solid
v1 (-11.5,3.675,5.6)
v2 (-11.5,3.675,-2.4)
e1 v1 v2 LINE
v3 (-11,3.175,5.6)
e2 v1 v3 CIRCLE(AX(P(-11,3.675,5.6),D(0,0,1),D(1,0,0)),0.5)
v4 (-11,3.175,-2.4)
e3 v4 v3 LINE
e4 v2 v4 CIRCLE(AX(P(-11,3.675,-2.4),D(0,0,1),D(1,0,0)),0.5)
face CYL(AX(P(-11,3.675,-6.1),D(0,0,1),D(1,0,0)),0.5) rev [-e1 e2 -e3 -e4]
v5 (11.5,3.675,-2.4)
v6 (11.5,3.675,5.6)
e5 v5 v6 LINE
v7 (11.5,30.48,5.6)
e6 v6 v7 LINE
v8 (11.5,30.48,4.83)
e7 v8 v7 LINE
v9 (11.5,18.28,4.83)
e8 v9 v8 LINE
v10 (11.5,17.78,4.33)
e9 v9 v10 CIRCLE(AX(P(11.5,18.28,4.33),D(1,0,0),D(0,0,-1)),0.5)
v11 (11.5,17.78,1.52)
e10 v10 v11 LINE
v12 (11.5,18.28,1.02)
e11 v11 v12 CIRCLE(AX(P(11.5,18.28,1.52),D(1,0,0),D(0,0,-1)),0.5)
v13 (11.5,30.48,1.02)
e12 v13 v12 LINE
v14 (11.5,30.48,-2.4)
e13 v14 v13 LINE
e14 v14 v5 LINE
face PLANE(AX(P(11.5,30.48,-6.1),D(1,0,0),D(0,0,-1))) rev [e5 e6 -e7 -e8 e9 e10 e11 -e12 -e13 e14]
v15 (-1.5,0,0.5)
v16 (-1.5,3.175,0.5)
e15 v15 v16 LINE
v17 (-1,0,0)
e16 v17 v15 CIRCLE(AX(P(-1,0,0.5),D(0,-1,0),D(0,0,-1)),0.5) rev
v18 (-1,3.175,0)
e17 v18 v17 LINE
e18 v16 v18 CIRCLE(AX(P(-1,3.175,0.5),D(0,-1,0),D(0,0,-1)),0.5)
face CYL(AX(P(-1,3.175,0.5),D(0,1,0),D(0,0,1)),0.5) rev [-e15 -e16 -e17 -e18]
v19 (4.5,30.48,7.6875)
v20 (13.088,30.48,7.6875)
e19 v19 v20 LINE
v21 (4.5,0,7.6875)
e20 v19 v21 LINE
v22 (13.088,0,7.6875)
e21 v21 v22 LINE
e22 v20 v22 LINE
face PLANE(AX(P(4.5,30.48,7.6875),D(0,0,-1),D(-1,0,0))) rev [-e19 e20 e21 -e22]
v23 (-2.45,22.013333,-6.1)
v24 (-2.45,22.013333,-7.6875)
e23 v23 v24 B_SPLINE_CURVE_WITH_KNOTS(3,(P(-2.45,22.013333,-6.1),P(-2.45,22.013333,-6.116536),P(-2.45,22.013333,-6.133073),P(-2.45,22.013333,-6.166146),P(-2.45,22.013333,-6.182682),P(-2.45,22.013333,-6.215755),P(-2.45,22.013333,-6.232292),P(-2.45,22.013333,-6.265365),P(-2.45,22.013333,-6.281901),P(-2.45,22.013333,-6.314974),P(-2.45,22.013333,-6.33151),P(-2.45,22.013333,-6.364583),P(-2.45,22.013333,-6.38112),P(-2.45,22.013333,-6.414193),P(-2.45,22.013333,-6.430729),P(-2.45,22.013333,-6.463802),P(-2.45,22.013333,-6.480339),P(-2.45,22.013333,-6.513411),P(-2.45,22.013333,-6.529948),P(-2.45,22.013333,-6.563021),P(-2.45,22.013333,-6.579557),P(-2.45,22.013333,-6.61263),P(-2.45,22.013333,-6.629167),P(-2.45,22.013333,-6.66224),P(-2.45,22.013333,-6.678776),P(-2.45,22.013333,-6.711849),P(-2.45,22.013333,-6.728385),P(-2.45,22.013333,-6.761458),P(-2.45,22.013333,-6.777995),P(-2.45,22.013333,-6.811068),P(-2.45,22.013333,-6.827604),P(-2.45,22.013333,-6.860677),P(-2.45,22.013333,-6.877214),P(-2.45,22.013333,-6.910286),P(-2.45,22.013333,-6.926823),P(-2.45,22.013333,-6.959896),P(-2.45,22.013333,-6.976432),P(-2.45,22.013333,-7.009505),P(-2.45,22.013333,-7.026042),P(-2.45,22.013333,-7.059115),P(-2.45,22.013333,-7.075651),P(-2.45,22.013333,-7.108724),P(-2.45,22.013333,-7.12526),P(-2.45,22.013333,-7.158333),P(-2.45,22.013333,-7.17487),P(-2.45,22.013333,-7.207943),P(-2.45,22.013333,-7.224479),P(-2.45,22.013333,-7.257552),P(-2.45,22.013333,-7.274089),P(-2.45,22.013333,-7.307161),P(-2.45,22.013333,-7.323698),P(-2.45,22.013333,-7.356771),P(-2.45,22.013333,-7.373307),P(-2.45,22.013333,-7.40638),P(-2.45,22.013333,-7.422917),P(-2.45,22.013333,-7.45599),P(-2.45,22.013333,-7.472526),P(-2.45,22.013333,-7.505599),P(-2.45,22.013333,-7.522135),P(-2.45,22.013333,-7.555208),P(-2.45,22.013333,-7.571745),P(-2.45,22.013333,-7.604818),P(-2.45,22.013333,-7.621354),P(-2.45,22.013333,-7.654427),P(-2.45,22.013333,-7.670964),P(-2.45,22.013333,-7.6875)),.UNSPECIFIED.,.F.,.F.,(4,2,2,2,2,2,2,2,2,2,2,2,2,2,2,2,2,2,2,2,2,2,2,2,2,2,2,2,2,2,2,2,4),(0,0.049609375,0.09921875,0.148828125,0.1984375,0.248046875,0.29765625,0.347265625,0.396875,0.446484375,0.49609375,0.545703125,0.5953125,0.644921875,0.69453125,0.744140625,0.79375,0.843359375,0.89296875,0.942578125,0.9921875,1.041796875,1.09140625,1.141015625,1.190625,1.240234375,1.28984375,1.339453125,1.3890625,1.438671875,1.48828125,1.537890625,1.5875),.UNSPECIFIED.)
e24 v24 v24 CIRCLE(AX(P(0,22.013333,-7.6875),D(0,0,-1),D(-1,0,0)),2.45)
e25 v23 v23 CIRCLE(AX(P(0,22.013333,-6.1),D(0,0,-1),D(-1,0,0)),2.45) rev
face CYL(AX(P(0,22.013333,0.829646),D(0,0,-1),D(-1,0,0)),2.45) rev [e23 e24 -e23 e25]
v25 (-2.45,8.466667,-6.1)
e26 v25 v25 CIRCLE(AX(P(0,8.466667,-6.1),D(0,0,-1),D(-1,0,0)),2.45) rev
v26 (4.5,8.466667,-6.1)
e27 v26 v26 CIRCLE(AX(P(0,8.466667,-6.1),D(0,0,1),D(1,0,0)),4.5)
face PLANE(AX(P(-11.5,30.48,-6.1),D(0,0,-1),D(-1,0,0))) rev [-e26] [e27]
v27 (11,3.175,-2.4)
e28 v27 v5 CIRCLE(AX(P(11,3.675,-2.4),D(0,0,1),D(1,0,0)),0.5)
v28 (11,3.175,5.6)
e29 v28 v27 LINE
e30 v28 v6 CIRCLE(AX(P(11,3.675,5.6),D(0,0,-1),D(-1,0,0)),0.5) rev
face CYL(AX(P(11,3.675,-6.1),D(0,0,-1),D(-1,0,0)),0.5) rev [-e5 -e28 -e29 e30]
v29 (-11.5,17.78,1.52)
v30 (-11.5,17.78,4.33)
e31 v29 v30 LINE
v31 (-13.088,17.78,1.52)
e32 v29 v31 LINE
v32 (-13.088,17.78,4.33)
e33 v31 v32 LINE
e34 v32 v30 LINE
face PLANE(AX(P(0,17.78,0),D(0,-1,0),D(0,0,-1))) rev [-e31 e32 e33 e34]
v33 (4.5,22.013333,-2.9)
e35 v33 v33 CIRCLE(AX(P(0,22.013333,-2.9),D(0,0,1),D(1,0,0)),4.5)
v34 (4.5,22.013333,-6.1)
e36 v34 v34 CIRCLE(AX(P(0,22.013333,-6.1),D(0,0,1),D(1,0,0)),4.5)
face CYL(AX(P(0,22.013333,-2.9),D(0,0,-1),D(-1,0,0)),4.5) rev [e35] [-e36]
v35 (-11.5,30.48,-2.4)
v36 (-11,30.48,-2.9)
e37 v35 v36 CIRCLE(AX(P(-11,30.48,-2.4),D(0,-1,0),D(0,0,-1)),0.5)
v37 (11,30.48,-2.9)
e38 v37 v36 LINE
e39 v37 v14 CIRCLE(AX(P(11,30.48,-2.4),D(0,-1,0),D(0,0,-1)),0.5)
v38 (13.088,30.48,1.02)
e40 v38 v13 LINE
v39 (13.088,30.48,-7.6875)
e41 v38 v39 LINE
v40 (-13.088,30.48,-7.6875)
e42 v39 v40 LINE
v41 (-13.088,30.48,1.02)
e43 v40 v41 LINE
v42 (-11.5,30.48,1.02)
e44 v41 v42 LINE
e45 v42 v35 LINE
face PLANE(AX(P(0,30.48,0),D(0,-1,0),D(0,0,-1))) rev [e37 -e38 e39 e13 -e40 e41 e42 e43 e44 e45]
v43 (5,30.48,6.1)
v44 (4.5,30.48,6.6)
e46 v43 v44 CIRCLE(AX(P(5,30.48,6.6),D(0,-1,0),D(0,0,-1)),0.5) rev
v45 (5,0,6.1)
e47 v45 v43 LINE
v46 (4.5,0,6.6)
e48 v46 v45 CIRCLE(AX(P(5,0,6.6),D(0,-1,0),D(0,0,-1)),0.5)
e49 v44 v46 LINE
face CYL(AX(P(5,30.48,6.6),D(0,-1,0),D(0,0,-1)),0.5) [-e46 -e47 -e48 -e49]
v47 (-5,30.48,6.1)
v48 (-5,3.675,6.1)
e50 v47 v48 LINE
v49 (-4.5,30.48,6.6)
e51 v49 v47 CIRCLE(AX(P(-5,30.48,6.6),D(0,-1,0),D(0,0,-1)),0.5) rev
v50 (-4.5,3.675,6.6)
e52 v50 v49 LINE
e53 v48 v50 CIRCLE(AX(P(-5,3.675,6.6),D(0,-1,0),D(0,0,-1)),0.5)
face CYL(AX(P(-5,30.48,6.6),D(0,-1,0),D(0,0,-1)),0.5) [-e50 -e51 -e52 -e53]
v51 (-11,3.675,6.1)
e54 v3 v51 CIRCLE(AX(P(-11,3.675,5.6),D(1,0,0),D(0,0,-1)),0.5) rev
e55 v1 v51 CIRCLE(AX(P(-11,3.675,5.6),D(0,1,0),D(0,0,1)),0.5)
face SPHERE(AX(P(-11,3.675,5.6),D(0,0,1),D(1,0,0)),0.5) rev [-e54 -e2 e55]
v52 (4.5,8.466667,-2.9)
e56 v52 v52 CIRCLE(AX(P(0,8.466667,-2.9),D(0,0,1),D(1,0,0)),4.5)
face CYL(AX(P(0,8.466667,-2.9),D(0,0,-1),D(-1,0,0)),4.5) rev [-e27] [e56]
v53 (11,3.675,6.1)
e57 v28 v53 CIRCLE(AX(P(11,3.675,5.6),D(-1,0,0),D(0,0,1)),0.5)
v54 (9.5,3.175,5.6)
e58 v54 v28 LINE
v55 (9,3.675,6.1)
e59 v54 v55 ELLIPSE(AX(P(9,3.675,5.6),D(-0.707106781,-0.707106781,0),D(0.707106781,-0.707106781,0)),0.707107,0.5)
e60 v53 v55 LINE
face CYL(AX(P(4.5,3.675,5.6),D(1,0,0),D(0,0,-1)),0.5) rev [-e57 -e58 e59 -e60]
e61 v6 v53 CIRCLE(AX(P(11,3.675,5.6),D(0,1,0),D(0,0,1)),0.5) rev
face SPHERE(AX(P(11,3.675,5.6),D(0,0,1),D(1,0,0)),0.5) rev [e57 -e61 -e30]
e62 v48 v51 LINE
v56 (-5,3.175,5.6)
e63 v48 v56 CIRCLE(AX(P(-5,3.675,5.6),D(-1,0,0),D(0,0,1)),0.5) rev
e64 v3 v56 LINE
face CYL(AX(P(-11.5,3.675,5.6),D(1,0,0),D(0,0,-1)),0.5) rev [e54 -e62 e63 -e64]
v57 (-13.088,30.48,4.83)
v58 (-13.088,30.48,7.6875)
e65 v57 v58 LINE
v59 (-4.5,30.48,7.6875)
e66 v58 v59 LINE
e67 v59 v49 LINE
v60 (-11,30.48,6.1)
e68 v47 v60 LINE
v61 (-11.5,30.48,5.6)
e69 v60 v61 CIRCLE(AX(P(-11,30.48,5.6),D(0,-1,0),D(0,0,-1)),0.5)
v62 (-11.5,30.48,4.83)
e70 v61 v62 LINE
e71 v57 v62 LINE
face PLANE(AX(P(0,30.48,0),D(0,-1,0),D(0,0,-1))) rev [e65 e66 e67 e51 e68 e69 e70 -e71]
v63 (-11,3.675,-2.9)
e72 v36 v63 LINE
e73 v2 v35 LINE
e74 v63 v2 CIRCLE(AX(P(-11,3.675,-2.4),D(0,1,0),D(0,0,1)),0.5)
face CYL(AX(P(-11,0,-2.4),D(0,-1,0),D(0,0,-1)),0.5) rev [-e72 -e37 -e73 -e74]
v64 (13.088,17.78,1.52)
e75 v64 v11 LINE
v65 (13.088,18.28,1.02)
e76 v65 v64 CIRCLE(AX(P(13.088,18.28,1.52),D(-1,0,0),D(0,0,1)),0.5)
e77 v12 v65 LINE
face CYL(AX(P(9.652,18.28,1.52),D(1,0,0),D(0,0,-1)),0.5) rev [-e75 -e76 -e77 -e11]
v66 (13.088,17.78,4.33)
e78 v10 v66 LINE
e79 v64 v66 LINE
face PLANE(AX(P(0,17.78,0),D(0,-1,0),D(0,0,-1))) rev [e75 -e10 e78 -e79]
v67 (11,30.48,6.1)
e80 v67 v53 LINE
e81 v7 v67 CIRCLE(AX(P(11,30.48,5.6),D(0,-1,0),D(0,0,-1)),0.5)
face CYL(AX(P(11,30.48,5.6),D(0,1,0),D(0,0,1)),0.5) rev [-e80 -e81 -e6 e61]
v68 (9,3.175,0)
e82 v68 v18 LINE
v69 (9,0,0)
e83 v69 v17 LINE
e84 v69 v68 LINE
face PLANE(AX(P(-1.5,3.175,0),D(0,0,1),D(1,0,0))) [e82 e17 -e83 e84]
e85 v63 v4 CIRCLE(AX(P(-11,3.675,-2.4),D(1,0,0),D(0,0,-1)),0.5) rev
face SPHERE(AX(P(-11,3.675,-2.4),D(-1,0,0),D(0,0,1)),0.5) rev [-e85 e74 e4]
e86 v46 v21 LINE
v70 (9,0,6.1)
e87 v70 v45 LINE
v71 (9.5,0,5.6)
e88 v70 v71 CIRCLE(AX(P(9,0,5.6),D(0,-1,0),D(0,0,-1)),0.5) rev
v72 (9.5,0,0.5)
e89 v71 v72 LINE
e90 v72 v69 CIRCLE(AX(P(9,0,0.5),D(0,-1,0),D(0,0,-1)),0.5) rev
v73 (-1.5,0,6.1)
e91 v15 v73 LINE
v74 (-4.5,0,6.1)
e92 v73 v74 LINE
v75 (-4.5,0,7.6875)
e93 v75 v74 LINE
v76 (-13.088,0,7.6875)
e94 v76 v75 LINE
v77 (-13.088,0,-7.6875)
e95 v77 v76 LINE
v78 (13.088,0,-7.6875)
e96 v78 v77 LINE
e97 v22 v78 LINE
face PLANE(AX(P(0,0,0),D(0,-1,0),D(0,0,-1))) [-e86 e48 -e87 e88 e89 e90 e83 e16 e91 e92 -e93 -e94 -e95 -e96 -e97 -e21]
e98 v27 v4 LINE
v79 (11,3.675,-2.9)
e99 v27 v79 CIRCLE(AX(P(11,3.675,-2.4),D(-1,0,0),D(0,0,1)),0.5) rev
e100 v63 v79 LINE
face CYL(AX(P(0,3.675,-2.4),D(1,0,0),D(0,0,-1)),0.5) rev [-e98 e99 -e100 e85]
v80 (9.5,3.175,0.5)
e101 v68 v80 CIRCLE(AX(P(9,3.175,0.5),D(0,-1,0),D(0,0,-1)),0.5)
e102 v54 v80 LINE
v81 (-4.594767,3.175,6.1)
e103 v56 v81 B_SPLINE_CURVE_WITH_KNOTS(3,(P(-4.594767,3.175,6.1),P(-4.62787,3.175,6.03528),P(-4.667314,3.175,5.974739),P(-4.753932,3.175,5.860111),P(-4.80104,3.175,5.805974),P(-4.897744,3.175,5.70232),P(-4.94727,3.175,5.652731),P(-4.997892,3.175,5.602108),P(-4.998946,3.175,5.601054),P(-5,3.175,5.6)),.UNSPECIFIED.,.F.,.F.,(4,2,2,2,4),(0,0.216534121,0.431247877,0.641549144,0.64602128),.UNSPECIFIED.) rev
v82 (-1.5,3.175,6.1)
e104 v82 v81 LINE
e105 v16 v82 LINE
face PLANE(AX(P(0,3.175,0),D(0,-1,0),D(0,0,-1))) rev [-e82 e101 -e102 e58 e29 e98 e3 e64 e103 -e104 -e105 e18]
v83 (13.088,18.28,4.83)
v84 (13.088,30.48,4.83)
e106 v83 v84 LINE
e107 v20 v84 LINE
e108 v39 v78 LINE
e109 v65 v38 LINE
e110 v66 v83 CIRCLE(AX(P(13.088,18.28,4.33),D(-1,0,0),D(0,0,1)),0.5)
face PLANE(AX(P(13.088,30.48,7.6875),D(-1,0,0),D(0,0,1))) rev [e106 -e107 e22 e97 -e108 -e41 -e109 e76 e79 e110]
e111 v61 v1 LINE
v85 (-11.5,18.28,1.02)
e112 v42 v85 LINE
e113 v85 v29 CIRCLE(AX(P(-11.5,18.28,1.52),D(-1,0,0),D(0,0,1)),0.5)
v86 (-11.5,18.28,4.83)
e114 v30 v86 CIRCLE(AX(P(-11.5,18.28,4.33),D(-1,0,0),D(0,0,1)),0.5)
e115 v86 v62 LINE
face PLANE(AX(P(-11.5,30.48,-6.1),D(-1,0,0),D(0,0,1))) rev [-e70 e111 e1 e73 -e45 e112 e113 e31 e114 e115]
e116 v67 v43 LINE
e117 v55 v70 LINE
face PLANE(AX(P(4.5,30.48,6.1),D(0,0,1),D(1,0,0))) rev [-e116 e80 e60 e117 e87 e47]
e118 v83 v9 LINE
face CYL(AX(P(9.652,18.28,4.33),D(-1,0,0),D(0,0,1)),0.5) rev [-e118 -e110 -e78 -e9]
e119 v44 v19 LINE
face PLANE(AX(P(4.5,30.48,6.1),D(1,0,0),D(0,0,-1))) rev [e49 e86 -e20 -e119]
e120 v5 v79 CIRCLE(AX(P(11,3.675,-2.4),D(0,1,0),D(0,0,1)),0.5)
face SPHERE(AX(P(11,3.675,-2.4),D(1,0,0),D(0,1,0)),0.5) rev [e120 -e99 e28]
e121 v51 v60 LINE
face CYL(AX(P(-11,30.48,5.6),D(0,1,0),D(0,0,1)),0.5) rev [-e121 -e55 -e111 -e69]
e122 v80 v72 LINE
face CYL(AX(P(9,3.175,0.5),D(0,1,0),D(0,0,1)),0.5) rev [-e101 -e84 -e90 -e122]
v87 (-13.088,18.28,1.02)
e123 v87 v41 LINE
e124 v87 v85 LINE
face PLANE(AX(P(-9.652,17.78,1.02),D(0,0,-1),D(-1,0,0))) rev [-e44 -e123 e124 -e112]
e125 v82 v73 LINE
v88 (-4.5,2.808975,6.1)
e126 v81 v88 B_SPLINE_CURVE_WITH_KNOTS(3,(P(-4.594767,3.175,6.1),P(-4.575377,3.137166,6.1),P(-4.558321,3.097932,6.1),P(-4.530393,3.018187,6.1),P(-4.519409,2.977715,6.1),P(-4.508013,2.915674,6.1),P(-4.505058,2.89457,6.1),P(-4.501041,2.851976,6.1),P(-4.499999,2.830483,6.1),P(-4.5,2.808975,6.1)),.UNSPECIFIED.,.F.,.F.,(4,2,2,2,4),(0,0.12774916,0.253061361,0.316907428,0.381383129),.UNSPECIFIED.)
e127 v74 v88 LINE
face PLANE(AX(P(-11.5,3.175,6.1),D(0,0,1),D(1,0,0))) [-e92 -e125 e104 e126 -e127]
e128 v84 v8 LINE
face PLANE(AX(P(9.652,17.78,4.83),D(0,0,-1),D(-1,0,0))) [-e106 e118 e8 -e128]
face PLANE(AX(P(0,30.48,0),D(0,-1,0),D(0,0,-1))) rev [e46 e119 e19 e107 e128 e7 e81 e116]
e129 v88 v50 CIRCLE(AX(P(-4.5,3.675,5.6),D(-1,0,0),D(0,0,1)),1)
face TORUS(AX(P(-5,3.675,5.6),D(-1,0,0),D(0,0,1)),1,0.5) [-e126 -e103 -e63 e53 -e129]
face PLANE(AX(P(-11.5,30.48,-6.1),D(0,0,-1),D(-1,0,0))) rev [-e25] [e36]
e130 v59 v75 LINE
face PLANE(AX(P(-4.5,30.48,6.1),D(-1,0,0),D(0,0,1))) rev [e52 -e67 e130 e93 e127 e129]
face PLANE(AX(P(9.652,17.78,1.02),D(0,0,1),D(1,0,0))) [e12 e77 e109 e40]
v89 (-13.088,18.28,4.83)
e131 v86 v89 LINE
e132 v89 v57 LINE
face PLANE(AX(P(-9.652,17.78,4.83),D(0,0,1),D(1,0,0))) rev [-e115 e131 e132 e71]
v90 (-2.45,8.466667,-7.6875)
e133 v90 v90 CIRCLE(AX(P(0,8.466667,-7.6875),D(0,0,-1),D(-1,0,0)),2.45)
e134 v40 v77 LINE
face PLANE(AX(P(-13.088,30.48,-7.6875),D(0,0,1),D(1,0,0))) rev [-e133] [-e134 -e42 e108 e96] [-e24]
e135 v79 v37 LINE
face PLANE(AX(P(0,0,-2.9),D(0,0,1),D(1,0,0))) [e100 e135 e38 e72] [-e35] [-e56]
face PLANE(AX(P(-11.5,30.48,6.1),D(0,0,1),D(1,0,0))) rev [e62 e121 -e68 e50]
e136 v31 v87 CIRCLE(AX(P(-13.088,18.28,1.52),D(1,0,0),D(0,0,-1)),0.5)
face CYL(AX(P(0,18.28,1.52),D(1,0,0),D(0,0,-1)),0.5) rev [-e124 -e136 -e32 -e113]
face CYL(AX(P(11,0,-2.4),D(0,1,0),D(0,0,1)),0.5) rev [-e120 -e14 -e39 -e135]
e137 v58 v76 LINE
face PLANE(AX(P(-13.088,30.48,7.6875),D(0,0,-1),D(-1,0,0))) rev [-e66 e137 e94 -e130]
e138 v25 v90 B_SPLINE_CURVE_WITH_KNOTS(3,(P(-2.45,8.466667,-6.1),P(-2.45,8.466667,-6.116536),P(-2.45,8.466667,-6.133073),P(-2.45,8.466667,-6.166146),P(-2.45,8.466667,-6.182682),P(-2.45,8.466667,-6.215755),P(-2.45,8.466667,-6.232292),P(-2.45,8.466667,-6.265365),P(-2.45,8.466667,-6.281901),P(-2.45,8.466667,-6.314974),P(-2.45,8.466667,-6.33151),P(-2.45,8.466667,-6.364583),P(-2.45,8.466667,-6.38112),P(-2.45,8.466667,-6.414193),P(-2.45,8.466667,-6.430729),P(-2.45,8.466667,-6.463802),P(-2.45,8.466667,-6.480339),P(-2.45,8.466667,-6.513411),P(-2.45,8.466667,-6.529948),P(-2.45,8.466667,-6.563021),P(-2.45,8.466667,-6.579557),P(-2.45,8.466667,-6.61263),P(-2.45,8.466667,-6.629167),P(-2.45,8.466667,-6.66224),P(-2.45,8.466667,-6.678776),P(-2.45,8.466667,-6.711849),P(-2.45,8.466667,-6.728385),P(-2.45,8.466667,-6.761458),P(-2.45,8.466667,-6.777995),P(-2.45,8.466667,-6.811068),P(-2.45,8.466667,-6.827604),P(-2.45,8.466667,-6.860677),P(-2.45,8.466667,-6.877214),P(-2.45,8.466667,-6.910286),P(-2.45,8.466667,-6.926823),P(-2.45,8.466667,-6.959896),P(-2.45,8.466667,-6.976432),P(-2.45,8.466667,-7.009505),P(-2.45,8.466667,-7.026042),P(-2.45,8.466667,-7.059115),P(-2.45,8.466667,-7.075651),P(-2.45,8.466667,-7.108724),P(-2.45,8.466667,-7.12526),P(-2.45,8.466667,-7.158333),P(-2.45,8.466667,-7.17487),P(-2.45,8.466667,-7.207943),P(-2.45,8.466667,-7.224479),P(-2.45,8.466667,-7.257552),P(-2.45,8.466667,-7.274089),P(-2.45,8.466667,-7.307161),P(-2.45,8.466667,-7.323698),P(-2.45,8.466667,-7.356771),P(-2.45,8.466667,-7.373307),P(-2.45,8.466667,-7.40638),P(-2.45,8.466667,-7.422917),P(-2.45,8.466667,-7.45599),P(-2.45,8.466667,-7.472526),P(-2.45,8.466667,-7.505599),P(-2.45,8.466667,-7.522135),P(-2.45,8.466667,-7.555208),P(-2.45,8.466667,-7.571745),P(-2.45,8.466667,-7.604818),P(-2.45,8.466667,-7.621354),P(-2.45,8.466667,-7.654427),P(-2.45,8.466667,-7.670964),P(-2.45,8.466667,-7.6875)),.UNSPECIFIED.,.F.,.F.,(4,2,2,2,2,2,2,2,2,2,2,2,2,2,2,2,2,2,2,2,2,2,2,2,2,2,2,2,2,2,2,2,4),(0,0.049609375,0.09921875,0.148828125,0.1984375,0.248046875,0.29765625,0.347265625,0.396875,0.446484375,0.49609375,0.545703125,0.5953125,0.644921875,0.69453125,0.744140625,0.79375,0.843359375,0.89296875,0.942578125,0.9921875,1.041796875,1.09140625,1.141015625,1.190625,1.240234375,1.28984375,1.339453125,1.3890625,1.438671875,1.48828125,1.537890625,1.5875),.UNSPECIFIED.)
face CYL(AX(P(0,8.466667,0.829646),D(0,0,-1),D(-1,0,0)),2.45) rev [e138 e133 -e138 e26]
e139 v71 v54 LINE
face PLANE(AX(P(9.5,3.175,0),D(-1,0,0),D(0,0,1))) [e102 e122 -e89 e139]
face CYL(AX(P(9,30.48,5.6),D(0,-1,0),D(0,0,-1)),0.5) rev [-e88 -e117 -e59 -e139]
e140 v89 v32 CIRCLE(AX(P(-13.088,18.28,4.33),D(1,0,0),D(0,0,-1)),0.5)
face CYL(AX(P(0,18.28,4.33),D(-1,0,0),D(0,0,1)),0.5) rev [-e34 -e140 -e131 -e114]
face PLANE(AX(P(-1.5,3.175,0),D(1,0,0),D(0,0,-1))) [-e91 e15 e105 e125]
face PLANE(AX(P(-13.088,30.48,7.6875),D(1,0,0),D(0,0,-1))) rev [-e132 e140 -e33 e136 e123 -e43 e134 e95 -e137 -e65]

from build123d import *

# Parameters (mm, degrees)
BOSS_EXTRUDE1_DEPTH = 30.48
BOSS_EXTRUDE2_DEPTH = 3.175
SKETCH3_W           = 3.436
SKETCH3_H           = 3.81
CUT_EXTRUDE1_DEPTH  = 12.7
SKETCH5_R           = 2.45
CUT_EXTRUDE2_DEPTH  = 1.5875
SKETCH6_W           = 23
SKETCH6_H           = 27.305
SKETCH6_R           = 4.5
BOSS_EXTRUDE3_DEPTH = 3.2
FILLET3_R           = 0.5
FILLET1_R           = 0.5
FILLET5_R           = 0.5
FILLET4_R           = 0.5
FILLET6_R           = 0.5


with BuildPart() as part:
    # Sketch1 → Boss-Extrude1 (new body)
    with BuildSketch(Plane(origin=(0, 0, 0), x_dir=(1, 0, 0), z_dir=(0, 1, 0))):
        Polygon((4.5, -6.1), (4.5, -7.6875), (13.088, -7.6875), (13.088, 7.6875), (-13.088, 7.6875), (-13.088, -7.6875), (-4.5, -7.6875), (-4.5, -6.1), (-11.5, -6.1), (-11.5, 6.1), (11.5, 6.1), (11.5, -6.1), align=None)
    extrude(amount=BOSS_EXTRUDE1_DEPTH)

    # Sketch2 → Boss-Extrude2 (add)
    with BuildSketch(Plane.XZ):
        Polygon((11.5, 0), (11.5, 6.1), (9.5, 6.1), (9.5, 0), (-1.5, 0), (-1.5, 6.1), (-11.5, 6.1), (-11.5, -6.1), (11.5, -6.1), align=None)
    extrude(amount=-BOSS_EXTRUDE2_DEPTH)

    # Sketch3 → Cut-Extrude1 (cut)
    with BuildSketch(Plane(origin=(0, 30.48, 0), x_dir=(1, 0, 0), z_dir=(0, 1, 0))):
        with Locations((-11.37, -2.925)):
            Rectangle(SKETCH3_W, SKETCH3_H)
    cut_extrude1 = extrude(amount=-CUT_EXTRUDE1_DEPTH, mode=Mode.SUBTRACT)

    # Mirror1: Cut-Extrude1 across plane
    add(cut_extrude1.mirror(Plane(origin=(0, 0, 0), x_dir=(0, 0, 1), z_dir=(1, 0, 0))), mode=Mode.SUBTRACT)

    # Sketch5 → Cut-Extrude2 (cut)
    with BuildSketch(Plane(origin=(0, 0, -7.6875), x_dir=(-1, 0, 0), z_dir=(0, 0, -1))):
        with Locations((0, 8.466666667)):
            Circle(SKETCH5_R)
        with Locations((0, 22.013333333)):
            Circle(SKETCH5_R)
    extrude(amount=-CUT_EXTRUDE2_DEPTH, mode=Mode.SUBTRACT)

    # Sketch6 → Boss-Extrude3 (add)
    with BuildSketch(Plane.XY.offset(-6.1)):
        with Locations((0, 16.8275)):
            Rectangle(SKETCH6_W, SKETCH6_H)
        with Locations((0, 22.013333333)):
            Circle(SKETCH6_R, mode=Mode.SUBTRACT)
        with Locations((0, 8.466666667)):
            Circle(SKETCH6_R, mode=Mode.SUBTRACT)
    extrude(amount=BOSS_EXTRUDE3_DEPTH)

    # Fillet3
    fillet3_edges = [part.edges().sort_by_distance(p)[0] for p in [
        (11.5, 3.175, 1.6),
        (0, 3.175, -2.9),
        (11.5, 16.8275, -2.9),
        (11.5, 16.8275, 6.1),
    ]]
    fillet(fillet3_edges, radius=FILLET3_R)

    # Fillet1
    fillet1_edges = [part.edges().sort_by_distance(p)[0] for p in [
        (-11.5, 17.0775, -2.9),
        (-11.5, 3.321446609, -2.753553391),
        (4.5, 15.24, 6.1),
        (-11.5, 3.175, 1.85),
        (-8, 3.175, 6.1),
    ]]
    fillet(fillet1_edges, radius=FILLET1_R)

    # Fillet5
    # the kernel refuses this fillet: 0.5 mm, written as the material it adds along each edge
    with BuildSketch(Plane(origin=(-13.088, 17.78, 4.83), x_dir=(0, 1, 0), z_dir=(1, 0, 0)), Plane(origin=(11.5, 17.78, 1.02), x_dir=(0, 0, 1), z_dir=(1, 0, 0))) as fillet5_piece_1:
        with BuildLine():
            CenterArc((FILLET5_R, -FILLET5_R), FILLET5_R, 90, 90)
            Line((0, -FILLET5_R), (0, 0))
            Line((0, 0), (FILLET5_R, 0))
        make_face()
    extrude(amount=1.588)
    with BuildSketch(Plane(origin=(-11.5, 17.78, 1.02), x_dir=(0, 0, 1), z_dir=(-1, 0, 0)), Plane(origin=(13.088, 17.78, 4.83), x_dir=(0, 1, 0), z_dir=(-1, 0, 0))) as fillet5_piece_2:
        with BuildLine():
            CenterArc((FILLET5_R, FILLET5_R), FILLET5_R, 180, 90)
            Line((0, FILLET5_R), (0, 0))
            Line((0, 0), (FILLET5_R, 0))
        make_face()
    extrude(amount=1.588)
    # the kernel refuses this fillet: 0.5 mm, written as the material it takes off along each edge
    with BuildSketch(Plane(origin=(-4.5, 3.675, 6.1), x_dir=(0, 0, 1), z_dir=(0, 1, 0))) as fillet5_2_piece_1:
        with BuildLine():
            CenterArc((FILLET5_R, -FILLET5_R), FILLET5_R, 90, 90)
            Line((0, -FILLET5_R), (0, 0))
            Line((0, 0), (FILLET5_R, 0))
        make_face()
    extrude(amount=28.055, mode=Mode.SUBTRACT)
    with BuildSketch(Plane(origin=(-4.5, 3.675, 5.6), x_dir=(0, 0.8017442392976493, -0.5976672776328263), z_dir=(0, 0.5976672776328263, 0.8017442392976493))) as fillet5_2_piece_2_section:
        with BuildLine():
            CenterArc((0.5 + FILLET5_R, FILLET5_R), FILLET5_R, 180, 90)
            Line((0.5, FILLET5_R), (0.5, 0))
            Line((0.5, 0), (0.5 + FILLET5_R, 0))
        make_face()
    fillet5_2_piece_2 = revolve(axis=Axis((-4.5, 3.675, 5.6), (-1, 0, 0)), revolution_arc=233.296989237, mode=Mode.PRIVATE)
    fillet5_2_piece_2 = split(fillet5_2_piece_2, bisect_by=Plane(origin=(-4.655814155, 3.175, 5.974969475), z_dir=(0, 1, 0)), keep=Keep.TOP, mode=Mode.PRIVATE)
    add(fillet5_2_piece_2, mode=Mode.SUBTRACT)
    with BuildSketch(Plane(origin=(-4.5, 3.675, 5.6), x_dir=(0, 0.8017442392976493, -0.5976672776328263), z_dir=(0, 0.5976672776328263, 0.8017442392976493))) as fillet5_2_piece_3_section:
        with BuildLine():
            CenterArc((0.5 + FILLET5_R, FILLET5_R), FILLET5_R, 180, 90)
            Line((0.5, FILLET5_R), (0.5, 0))
            Line((0.5, 0), (0.5 + FILLET5_R, 0))
        make_face()
    fillet5_2_piece_3 = revolve(axis=Axis((-4.5, 3.675, 5.6), (-1, 0, 0)), revolution_arc=233.296989237, mode=Mode.PRIVATE)
    fillet5_2_piece_3 = split(fillet5_2_piece_3, bisect_by=Plane(origin=(-4.518548164, 3.09595455, 6.1), z_dir=(0, 0, 1)), keep=Keep.TOP, mode=Mode.PRIVATE)
    add(fillet5_2_piece_3, mode=Mode.SUBTRACT)

    # Fillet4
    # the kernel refuses this fillet: 0.5 mm, written as the material it adds along each edge
    with BuildSketch(Plane(origin=(-11, 3.675, 5.6), x_dir=(-1, 0, 0), z_dir=(0, 0, 1))) as fillet4_piece_1_section:
        Polygon((0, 0), (FILLET4_R, 0), (FILLET4_R, FILLET4_R), (0, FILLET4_R), align=None)
    fillet4_piece_1 = extrude(amount=FILLET4_R, mode=Mode.PRIVATE)
    fillet4_piece_1 = fillet4_piece_1 - Plane(origin=(-11, 3.675, 5.6), x_dir=(0.7071067811865475, 0.7071067811865475, 0), z_dir=(0, 0, 1)) * Sphere(FILLET4_R, mode=Mode.PRIVATE)
    add(fillet4_piece_1)
    with BuildSketch(Plane(origin=(-11.5, 3.675, 6.1), x_dir=(1, 0, 0), z_dir=(0, 1, 0))) as fillet4_piece_2:
        with BuildLine():
            CenterArc((FILLET4_R, FILLET4_R), FILLET4_R, 180, 90)
            Line((0, FILLET4_R), (0, 0))
            Line((0, 0), (FILLET4_R, 0))
        make_face()
    extrude(amount=26.805)

    # Fillet6
    # the kernel refuses this fillet: 0.5 mm, written as the material it adds along each edge
    with BuildSketch(Plane(origin=(11, 3.675, 5.6), x_dir=(0, 0, 1), z_dir=(0, -1, 0))) as fillet6_piece_1_section:
        Polygon((0, 0), (FILLET6_R, 0), (FILLET6_R, -FILLET6_R), (0, -FILLET6_R), align=None)
    fillet6_piece_1 = extrude(amount=FILLET6_R, mode=Mode.PRIVATE)
    fillet6_piece_1 = fillet6_piece_1 - Plane(origin=(11, 3.675, 5.6), x_dir=(-0.7071067811865475, 0, -0.7071067811865475), z_dir=(0, -1, 0)) * Sphere(FILLET6_R, mode=Mode.PRIVATE)
    add(fillet6_piece_1)
    with BuildSketch(Plane(origin=(11, 3.175, 6.1), x_dir=(0, 0, -1), z_dir=(-1, 0, 0))) as fillet6_piece_2:
        with BuildLine():
            CenterArc((FILLET6_R, -FILLET6_R), FILLET6_R, 90, 90)
            Line((0, -FILLET6_R), (0, 0))
            Line((0, 0), (FILLET6_R, 0))
        make_face()
    extrude(amount=1.5)
    with BuildSketch(Plane(origin=(-1.5, 0, 0), x_dir=(1, 0, 0), z_dir=(0, 1, 0)), Plane(origin=(9.5, 0, 0), x_dir=(0, 0, 1), z_dir=(0, 1, 0)), Plane(origin=(9.5, 0, 6.1), x_dir=(-1, 0, 0), z_dir=(0, 1, 0))) as fillet6_piece_3:
        with BuildLine():
            CenterArc((FILLET6_R, -FILLET6_R), FILLET6_R, 90, 90)
            Line((0, -FILLET6_R), (0, 0))
            Line((0, 0), (FILLET6_R, 0))
        make_face()
    extrude(amount=3.175)
    with BuildSketch(Plane(origin=(11, 3.175, 6.1), x_dir=(0, 0, -1), z_dir=(-1, 0, 0))) as fillet6_piece_4a_section:
        with BuildLine():
            CenterArc((FILLET6_R, -FILLET6_R), FILLET6_R, 90, 90)
            Line((0, -FILLET6_R), (0, 0))
            Line((0, 0), (FILLET6_R, 0))
        make_face()
    fillet6_piece_4a = extrude(amount=2.75, mode=Mode.PRIVATE)
    fillet6_piece_4a = split(fillet6_piece_4a, bisect_by=Plane(origin=(9.5, 3.288197557, 5.986802443), z_dir=(-1, 0, 0)), keep=Keep.TOP, mode=Mode.PRIVATE)
    with BuildSketch(Plane(origin=(9.5, 0, 6.1), x_dir=(-1, 0, 0), z_dir=(0, 1, 0))) as fillet6_piece_4b_section:
        with BuildLine():
            CenterArc((FILLET6_R, -FILLET6_R), FILLET6_R, 90, 90)
            Line((0, -FILLET6_R), (0, 0))
            Line((0, 0), (FILLET6_R, 0))
        make_face()
    fillet6_piece_4b = extrude(amount=4.425, mode=Mode.PRIVATE)
    fillet6_piece_4b = split(fillet6_piece_4b, bisect_by=Plane(origin=(9.386802443, 3.175, 5.986802443), z_dir=(0, 1, 0)), keep=Keep.TOP, mode=Mode.PRIVATE)
    fillet6_piece_4 = fillet6_piece_4a & fillet6_piece_4b
    add(fillet6_piece_4)


solid = part.part
